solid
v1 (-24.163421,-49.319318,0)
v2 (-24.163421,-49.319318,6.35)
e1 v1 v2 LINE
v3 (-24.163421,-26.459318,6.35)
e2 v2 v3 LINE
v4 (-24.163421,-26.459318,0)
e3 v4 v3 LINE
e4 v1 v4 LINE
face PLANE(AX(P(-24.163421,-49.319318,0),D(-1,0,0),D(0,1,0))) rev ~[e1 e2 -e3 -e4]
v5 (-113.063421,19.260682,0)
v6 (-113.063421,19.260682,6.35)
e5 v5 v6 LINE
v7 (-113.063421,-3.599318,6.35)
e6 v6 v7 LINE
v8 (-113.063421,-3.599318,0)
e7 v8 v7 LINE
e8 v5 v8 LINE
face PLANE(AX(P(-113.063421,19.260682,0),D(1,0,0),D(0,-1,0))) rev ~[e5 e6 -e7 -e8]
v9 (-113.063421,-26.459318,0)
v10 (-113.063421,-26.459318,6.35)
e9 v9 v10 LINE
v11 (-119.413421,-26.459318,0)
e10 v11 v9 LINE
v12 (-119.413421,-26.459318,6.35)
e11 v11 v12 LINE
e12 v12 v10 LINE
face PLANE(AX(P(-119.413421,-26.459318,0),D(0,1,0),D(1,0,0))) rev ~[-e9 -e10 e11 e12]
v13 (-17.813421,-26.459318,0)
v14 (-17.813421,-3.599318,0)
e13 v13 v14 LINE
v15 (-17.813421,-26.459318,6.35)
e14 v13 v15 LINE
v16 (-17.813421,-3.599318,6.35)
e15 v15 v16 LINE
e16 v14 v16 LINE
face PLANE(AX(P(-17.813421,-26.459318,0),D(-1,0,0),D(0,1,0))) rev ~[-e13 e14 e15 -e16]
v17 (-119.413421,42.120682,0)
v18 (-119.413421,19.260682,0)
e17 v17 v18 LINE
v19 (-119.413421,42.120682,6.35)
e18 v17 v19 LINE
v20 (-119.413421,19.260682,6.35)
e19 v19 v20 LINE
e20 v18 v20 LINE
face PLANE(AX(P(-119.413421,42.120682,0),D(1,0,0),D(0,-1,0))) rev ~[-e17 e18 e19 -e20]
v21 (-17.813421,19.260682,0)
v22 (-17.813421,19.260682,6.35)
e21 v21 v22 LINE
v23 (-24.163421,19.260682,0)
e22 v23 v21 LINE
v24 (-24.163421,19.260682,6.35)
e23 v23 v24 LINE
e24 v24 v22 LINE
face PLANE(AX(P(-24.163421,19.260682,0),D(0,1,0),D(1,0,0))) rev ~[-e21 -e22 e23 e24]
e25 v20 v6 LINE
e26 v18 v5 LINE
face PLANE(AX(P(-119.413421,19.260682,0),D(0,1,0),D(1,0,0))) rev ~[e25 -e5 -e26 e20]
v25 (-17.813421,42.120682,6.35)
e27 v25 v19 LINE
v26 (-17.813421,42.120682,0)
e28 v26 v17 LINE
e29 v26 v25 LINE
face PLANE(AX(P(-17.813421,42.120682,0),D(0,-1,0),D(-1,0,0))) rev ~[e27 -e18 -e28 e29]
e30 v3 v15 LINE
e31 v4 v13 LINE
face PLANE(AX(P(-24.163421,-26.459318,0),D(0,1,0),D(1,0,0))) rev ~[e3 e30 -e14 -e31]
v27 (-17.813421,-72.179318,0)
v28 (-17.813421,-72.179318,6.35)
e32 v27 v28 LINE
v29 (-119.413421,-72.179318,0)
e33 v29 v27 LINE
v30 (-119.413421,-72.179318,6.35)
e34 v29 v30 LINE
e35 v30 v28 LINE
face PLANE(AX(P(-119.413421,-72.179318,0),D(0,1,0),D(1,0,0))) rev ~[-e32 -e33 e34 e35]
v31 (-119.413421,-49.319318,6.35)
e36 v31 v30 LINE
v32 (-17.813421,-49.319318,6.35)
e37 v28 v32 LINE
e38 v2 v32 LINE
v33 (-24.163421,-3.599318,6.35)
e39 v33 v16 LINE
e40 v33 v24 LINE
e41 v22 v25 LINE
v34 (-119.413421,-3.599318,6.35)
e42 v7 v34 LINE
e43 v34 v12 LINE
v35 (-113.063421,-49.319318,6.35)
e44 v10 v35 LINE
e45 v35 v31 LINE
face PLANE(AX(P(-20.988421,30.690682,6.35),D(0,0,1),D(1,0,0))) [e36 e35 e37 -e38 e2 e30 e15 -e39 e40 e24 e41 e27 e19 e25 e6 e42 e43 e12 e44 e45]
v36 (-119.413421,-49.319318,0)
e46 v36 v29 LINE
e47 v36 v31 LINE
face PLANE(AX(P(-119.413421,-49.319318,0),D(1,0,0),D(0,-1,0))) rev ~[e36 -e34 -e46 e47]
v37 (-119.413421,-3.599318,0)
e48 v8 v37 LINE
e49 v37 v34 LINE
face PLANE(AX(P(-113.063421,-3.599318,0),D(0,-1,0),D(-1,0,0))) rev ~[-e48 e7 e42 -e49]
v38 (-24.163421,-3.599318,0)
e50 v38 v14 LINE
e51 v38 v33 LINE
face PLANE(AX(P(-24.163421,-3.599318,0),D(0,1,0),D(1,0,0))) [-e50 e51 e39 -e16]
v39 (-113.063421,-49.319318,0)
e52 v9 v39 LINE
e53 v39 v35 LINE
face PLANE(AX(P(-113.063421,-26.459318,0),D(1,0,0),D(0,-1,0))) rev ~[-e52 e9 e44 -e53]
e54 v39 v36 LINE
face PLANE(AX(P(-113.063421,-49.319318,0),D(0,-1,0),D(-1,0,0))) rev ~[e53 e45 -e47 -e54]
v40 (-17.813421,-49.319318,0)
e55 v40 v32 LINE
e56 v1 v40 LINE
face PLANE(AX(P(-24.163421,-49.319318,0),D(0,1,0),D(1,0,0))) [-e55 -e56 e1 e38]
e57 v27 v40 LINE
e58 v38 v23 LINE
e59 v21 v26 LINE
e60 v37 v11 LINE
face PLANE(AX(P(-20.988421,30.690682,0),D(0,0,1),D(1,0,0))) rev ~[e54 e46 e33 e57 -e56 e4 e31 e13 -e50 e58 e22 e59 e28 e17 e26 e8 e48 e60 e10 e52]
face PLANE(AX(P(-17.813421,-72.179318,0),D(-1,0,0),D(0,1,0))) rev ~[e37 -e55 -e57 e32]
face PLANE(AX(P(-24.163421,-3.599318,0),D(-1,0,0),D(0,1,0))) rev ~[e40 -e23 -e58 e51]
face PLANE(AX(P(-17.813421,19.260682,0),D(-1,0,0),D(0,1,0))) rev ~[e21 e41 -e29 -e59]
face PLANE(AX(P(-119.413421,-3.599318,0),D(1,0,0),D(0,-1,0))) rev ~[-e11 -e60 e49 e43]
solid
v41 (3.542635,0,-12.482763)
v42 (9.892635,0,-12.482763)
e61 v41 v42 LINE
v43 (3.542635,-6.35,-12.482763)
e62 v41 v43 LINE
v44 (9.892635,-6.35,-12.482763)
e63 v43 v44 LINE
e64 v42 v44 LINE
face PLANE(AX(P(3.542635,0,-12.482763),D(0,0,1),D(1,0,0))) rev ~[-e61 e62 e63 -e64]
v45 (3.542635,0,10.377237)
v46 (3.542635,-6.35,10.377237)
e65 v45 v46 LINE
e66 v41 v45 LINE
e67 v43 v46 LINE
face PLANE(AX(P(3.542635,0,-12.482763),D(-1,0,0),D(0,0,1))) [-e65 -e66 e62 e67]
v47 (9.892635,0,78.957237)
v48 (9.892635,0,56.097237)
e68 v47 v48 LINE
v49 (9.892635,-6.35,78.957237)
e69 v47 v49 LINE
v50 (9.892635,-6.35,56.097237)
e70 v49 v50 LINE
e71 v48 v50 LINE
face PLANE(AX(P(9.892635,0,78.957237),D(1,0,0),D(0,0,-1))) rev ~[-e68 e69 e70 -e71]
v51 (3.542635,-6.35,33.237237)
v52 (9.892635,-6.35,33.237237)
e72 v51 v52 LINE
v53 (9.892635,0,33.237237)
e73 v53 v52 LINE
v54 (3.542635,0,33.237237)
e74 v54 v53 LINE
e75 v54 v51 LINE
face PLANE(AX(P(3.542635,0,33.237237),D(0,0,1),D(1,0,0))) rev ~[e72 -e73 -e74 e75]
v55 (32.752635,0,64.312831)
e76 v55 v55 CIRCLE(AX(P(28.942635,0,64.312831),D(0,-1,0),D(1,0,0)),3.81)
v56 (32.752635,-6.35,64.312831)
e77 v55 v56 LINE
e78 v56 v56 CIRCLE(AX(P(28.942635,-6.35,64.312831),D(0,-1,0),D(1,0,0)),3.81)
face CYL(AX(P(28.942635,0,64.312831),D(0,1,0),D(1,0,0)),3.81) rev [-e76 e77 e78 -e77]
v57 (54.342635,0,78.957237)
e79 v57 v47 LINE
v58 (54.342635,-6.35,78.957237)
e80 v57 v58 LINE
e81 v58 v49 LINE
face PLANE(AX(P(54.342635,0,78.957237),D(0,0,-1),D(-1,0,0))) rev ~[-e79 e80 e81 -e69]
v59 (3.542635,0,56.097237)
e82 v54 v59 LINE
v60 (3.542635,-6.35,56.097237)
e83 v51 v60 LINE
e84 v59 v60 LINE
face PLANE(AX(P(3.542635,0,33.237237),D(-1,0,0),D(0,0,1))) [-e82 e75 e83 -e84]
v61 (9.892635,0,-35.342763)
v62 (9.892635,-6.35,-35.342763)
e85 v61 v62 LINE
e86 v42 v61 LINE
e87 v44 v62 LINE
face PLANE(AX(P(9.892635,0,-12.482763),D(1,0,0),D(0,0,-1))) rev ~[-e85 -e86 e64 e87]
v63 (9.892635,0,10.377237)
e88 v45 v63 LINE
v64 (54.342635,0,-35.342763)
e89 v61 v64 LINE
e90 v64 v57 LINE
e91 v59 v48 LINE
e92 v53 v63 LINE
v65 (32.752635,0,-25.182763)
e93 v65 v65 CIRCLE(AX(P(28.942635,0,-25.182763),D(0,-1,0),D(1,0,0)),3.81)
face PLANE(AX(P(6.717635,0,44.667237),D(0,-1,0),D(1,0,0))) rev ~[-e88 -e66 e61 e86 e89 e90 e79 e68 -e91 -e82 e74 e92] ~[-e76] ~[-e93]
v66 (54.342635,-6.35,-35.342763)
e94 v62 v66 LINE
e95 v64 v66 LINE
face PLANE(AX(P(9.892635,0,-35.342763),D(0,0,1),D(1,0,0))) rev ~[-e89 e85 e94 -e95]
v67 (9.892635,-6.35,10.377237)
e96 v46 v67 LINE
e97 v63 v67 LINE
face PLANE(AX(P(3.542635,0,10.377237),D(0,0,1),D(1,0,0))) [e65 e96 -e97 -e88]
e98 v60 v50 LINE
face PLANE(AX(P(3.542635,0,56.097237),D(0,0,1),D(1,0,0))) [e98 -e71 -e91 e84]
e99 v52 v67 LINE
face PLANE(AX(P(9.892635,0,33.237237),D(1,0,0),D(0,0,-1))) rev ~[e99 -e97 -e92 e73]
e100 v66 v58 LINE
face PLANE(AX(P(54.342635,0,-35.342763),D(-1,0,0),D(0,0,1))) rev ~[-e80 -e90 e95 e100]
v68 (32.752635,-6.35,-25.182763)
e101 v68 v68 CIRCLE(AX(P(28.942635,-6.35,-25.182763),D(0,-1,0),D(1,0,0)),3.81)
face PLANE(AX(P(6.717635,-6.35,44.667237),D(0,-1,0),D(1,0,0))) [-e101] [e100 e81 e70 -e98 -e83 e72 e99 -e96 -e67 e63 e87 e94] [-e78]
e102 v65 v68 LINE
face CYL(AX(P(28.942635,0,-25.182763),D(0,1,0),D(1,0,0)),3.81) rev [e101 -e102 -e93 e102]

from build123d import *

# Parameters (mm, degrees)
F0_W     = 6.35
F0_H     = 22.86
F1_DEPTH = 6.35
F2_W     = 6.35
F2_H     = 22.86
F2_R     = 3.81
F3_DEPTH = 6.35


# Not quite as in the source:
# - a length typed as a fraction of an inch, garbled in the dataset ("3 / 203.2 mm" for 3/8 in), is restored


with BuildPart() as f1:
    # F0 (on Top) → F1 (new body)
    with BuildSketch(Plane.XY):
        with Locations((-20.988421008, 30.6906817461)):
            Rectangle(F0_W, F0_H)
        with Locations((-20.988421008, -60.7493182539)):
            Rectangle(F0_W, F0_H)
        Polygon((-24.163421008, 42.1206817461), (-68.613421008, 42.1206817461), (-119.413421008, 42.1206817461), (-119.413421008, 19.2606817461), (-113.063421008, 19.2606817461), (-113.063421008, -3.5993182539), (-119.413421008, -3.5993182539), (-119.413421008, -26.4593182539), (-113.063421008, -26.4593182539), (-113.063421008, -49.3193182539), (-119.413421008, -49.3193182539), (-119.413421008, -72.1793182539), (-68.613421008, -72.1793182539), (-24.163421008, -72.1793182539), (-24.163421008, -49.3193182539), (-24.163421008, -26.4593182539), (-24.163421008, -3.5993182539), (-24.163421008, 19.2606817461), align=None)
        with Locations((-20.988421008, -15.0293182539)):
            Rectangle(F0_W, F0_H)
    extrude(amount=F1_DEPTH)


with BuildPart() as f3:
    # F2 (on Front) → F3 (new body)
    with BuildSketch(Plane.XZ):
        with Locations((6.7176349759, 44.6672367319)):
            Rectangle(F2_W, F2_H)
        with Locations((6.7176349759, -1.0527632681)):
            Rectangle(F2_W, F2_H)
        Polygon((54.3426349759, 78.9572367319), (9.8926349759, 78.9572367319), (9.8926349759, 56.0972367319), (9.8926349759, 33.2372367319), (9.8926349759, 10.3772367319), (9.8926349759, -12.4827632681), (9.8926349759, -35.3427632681), (54.3426349759, -35.3427632681), align=None)
        with Locations((28.9426349759, -25.1827632681)):
            Circle(F2_R, mode=Mode.SUBTRACT)
        with Locations((28.9426349759, 64.3128305674)):
            Circle(F2_R, mode=Mode.SUBTRACT)
    extrude(amount=F3_DEPTH)


solid = Compound([f1.part, f3.part])
